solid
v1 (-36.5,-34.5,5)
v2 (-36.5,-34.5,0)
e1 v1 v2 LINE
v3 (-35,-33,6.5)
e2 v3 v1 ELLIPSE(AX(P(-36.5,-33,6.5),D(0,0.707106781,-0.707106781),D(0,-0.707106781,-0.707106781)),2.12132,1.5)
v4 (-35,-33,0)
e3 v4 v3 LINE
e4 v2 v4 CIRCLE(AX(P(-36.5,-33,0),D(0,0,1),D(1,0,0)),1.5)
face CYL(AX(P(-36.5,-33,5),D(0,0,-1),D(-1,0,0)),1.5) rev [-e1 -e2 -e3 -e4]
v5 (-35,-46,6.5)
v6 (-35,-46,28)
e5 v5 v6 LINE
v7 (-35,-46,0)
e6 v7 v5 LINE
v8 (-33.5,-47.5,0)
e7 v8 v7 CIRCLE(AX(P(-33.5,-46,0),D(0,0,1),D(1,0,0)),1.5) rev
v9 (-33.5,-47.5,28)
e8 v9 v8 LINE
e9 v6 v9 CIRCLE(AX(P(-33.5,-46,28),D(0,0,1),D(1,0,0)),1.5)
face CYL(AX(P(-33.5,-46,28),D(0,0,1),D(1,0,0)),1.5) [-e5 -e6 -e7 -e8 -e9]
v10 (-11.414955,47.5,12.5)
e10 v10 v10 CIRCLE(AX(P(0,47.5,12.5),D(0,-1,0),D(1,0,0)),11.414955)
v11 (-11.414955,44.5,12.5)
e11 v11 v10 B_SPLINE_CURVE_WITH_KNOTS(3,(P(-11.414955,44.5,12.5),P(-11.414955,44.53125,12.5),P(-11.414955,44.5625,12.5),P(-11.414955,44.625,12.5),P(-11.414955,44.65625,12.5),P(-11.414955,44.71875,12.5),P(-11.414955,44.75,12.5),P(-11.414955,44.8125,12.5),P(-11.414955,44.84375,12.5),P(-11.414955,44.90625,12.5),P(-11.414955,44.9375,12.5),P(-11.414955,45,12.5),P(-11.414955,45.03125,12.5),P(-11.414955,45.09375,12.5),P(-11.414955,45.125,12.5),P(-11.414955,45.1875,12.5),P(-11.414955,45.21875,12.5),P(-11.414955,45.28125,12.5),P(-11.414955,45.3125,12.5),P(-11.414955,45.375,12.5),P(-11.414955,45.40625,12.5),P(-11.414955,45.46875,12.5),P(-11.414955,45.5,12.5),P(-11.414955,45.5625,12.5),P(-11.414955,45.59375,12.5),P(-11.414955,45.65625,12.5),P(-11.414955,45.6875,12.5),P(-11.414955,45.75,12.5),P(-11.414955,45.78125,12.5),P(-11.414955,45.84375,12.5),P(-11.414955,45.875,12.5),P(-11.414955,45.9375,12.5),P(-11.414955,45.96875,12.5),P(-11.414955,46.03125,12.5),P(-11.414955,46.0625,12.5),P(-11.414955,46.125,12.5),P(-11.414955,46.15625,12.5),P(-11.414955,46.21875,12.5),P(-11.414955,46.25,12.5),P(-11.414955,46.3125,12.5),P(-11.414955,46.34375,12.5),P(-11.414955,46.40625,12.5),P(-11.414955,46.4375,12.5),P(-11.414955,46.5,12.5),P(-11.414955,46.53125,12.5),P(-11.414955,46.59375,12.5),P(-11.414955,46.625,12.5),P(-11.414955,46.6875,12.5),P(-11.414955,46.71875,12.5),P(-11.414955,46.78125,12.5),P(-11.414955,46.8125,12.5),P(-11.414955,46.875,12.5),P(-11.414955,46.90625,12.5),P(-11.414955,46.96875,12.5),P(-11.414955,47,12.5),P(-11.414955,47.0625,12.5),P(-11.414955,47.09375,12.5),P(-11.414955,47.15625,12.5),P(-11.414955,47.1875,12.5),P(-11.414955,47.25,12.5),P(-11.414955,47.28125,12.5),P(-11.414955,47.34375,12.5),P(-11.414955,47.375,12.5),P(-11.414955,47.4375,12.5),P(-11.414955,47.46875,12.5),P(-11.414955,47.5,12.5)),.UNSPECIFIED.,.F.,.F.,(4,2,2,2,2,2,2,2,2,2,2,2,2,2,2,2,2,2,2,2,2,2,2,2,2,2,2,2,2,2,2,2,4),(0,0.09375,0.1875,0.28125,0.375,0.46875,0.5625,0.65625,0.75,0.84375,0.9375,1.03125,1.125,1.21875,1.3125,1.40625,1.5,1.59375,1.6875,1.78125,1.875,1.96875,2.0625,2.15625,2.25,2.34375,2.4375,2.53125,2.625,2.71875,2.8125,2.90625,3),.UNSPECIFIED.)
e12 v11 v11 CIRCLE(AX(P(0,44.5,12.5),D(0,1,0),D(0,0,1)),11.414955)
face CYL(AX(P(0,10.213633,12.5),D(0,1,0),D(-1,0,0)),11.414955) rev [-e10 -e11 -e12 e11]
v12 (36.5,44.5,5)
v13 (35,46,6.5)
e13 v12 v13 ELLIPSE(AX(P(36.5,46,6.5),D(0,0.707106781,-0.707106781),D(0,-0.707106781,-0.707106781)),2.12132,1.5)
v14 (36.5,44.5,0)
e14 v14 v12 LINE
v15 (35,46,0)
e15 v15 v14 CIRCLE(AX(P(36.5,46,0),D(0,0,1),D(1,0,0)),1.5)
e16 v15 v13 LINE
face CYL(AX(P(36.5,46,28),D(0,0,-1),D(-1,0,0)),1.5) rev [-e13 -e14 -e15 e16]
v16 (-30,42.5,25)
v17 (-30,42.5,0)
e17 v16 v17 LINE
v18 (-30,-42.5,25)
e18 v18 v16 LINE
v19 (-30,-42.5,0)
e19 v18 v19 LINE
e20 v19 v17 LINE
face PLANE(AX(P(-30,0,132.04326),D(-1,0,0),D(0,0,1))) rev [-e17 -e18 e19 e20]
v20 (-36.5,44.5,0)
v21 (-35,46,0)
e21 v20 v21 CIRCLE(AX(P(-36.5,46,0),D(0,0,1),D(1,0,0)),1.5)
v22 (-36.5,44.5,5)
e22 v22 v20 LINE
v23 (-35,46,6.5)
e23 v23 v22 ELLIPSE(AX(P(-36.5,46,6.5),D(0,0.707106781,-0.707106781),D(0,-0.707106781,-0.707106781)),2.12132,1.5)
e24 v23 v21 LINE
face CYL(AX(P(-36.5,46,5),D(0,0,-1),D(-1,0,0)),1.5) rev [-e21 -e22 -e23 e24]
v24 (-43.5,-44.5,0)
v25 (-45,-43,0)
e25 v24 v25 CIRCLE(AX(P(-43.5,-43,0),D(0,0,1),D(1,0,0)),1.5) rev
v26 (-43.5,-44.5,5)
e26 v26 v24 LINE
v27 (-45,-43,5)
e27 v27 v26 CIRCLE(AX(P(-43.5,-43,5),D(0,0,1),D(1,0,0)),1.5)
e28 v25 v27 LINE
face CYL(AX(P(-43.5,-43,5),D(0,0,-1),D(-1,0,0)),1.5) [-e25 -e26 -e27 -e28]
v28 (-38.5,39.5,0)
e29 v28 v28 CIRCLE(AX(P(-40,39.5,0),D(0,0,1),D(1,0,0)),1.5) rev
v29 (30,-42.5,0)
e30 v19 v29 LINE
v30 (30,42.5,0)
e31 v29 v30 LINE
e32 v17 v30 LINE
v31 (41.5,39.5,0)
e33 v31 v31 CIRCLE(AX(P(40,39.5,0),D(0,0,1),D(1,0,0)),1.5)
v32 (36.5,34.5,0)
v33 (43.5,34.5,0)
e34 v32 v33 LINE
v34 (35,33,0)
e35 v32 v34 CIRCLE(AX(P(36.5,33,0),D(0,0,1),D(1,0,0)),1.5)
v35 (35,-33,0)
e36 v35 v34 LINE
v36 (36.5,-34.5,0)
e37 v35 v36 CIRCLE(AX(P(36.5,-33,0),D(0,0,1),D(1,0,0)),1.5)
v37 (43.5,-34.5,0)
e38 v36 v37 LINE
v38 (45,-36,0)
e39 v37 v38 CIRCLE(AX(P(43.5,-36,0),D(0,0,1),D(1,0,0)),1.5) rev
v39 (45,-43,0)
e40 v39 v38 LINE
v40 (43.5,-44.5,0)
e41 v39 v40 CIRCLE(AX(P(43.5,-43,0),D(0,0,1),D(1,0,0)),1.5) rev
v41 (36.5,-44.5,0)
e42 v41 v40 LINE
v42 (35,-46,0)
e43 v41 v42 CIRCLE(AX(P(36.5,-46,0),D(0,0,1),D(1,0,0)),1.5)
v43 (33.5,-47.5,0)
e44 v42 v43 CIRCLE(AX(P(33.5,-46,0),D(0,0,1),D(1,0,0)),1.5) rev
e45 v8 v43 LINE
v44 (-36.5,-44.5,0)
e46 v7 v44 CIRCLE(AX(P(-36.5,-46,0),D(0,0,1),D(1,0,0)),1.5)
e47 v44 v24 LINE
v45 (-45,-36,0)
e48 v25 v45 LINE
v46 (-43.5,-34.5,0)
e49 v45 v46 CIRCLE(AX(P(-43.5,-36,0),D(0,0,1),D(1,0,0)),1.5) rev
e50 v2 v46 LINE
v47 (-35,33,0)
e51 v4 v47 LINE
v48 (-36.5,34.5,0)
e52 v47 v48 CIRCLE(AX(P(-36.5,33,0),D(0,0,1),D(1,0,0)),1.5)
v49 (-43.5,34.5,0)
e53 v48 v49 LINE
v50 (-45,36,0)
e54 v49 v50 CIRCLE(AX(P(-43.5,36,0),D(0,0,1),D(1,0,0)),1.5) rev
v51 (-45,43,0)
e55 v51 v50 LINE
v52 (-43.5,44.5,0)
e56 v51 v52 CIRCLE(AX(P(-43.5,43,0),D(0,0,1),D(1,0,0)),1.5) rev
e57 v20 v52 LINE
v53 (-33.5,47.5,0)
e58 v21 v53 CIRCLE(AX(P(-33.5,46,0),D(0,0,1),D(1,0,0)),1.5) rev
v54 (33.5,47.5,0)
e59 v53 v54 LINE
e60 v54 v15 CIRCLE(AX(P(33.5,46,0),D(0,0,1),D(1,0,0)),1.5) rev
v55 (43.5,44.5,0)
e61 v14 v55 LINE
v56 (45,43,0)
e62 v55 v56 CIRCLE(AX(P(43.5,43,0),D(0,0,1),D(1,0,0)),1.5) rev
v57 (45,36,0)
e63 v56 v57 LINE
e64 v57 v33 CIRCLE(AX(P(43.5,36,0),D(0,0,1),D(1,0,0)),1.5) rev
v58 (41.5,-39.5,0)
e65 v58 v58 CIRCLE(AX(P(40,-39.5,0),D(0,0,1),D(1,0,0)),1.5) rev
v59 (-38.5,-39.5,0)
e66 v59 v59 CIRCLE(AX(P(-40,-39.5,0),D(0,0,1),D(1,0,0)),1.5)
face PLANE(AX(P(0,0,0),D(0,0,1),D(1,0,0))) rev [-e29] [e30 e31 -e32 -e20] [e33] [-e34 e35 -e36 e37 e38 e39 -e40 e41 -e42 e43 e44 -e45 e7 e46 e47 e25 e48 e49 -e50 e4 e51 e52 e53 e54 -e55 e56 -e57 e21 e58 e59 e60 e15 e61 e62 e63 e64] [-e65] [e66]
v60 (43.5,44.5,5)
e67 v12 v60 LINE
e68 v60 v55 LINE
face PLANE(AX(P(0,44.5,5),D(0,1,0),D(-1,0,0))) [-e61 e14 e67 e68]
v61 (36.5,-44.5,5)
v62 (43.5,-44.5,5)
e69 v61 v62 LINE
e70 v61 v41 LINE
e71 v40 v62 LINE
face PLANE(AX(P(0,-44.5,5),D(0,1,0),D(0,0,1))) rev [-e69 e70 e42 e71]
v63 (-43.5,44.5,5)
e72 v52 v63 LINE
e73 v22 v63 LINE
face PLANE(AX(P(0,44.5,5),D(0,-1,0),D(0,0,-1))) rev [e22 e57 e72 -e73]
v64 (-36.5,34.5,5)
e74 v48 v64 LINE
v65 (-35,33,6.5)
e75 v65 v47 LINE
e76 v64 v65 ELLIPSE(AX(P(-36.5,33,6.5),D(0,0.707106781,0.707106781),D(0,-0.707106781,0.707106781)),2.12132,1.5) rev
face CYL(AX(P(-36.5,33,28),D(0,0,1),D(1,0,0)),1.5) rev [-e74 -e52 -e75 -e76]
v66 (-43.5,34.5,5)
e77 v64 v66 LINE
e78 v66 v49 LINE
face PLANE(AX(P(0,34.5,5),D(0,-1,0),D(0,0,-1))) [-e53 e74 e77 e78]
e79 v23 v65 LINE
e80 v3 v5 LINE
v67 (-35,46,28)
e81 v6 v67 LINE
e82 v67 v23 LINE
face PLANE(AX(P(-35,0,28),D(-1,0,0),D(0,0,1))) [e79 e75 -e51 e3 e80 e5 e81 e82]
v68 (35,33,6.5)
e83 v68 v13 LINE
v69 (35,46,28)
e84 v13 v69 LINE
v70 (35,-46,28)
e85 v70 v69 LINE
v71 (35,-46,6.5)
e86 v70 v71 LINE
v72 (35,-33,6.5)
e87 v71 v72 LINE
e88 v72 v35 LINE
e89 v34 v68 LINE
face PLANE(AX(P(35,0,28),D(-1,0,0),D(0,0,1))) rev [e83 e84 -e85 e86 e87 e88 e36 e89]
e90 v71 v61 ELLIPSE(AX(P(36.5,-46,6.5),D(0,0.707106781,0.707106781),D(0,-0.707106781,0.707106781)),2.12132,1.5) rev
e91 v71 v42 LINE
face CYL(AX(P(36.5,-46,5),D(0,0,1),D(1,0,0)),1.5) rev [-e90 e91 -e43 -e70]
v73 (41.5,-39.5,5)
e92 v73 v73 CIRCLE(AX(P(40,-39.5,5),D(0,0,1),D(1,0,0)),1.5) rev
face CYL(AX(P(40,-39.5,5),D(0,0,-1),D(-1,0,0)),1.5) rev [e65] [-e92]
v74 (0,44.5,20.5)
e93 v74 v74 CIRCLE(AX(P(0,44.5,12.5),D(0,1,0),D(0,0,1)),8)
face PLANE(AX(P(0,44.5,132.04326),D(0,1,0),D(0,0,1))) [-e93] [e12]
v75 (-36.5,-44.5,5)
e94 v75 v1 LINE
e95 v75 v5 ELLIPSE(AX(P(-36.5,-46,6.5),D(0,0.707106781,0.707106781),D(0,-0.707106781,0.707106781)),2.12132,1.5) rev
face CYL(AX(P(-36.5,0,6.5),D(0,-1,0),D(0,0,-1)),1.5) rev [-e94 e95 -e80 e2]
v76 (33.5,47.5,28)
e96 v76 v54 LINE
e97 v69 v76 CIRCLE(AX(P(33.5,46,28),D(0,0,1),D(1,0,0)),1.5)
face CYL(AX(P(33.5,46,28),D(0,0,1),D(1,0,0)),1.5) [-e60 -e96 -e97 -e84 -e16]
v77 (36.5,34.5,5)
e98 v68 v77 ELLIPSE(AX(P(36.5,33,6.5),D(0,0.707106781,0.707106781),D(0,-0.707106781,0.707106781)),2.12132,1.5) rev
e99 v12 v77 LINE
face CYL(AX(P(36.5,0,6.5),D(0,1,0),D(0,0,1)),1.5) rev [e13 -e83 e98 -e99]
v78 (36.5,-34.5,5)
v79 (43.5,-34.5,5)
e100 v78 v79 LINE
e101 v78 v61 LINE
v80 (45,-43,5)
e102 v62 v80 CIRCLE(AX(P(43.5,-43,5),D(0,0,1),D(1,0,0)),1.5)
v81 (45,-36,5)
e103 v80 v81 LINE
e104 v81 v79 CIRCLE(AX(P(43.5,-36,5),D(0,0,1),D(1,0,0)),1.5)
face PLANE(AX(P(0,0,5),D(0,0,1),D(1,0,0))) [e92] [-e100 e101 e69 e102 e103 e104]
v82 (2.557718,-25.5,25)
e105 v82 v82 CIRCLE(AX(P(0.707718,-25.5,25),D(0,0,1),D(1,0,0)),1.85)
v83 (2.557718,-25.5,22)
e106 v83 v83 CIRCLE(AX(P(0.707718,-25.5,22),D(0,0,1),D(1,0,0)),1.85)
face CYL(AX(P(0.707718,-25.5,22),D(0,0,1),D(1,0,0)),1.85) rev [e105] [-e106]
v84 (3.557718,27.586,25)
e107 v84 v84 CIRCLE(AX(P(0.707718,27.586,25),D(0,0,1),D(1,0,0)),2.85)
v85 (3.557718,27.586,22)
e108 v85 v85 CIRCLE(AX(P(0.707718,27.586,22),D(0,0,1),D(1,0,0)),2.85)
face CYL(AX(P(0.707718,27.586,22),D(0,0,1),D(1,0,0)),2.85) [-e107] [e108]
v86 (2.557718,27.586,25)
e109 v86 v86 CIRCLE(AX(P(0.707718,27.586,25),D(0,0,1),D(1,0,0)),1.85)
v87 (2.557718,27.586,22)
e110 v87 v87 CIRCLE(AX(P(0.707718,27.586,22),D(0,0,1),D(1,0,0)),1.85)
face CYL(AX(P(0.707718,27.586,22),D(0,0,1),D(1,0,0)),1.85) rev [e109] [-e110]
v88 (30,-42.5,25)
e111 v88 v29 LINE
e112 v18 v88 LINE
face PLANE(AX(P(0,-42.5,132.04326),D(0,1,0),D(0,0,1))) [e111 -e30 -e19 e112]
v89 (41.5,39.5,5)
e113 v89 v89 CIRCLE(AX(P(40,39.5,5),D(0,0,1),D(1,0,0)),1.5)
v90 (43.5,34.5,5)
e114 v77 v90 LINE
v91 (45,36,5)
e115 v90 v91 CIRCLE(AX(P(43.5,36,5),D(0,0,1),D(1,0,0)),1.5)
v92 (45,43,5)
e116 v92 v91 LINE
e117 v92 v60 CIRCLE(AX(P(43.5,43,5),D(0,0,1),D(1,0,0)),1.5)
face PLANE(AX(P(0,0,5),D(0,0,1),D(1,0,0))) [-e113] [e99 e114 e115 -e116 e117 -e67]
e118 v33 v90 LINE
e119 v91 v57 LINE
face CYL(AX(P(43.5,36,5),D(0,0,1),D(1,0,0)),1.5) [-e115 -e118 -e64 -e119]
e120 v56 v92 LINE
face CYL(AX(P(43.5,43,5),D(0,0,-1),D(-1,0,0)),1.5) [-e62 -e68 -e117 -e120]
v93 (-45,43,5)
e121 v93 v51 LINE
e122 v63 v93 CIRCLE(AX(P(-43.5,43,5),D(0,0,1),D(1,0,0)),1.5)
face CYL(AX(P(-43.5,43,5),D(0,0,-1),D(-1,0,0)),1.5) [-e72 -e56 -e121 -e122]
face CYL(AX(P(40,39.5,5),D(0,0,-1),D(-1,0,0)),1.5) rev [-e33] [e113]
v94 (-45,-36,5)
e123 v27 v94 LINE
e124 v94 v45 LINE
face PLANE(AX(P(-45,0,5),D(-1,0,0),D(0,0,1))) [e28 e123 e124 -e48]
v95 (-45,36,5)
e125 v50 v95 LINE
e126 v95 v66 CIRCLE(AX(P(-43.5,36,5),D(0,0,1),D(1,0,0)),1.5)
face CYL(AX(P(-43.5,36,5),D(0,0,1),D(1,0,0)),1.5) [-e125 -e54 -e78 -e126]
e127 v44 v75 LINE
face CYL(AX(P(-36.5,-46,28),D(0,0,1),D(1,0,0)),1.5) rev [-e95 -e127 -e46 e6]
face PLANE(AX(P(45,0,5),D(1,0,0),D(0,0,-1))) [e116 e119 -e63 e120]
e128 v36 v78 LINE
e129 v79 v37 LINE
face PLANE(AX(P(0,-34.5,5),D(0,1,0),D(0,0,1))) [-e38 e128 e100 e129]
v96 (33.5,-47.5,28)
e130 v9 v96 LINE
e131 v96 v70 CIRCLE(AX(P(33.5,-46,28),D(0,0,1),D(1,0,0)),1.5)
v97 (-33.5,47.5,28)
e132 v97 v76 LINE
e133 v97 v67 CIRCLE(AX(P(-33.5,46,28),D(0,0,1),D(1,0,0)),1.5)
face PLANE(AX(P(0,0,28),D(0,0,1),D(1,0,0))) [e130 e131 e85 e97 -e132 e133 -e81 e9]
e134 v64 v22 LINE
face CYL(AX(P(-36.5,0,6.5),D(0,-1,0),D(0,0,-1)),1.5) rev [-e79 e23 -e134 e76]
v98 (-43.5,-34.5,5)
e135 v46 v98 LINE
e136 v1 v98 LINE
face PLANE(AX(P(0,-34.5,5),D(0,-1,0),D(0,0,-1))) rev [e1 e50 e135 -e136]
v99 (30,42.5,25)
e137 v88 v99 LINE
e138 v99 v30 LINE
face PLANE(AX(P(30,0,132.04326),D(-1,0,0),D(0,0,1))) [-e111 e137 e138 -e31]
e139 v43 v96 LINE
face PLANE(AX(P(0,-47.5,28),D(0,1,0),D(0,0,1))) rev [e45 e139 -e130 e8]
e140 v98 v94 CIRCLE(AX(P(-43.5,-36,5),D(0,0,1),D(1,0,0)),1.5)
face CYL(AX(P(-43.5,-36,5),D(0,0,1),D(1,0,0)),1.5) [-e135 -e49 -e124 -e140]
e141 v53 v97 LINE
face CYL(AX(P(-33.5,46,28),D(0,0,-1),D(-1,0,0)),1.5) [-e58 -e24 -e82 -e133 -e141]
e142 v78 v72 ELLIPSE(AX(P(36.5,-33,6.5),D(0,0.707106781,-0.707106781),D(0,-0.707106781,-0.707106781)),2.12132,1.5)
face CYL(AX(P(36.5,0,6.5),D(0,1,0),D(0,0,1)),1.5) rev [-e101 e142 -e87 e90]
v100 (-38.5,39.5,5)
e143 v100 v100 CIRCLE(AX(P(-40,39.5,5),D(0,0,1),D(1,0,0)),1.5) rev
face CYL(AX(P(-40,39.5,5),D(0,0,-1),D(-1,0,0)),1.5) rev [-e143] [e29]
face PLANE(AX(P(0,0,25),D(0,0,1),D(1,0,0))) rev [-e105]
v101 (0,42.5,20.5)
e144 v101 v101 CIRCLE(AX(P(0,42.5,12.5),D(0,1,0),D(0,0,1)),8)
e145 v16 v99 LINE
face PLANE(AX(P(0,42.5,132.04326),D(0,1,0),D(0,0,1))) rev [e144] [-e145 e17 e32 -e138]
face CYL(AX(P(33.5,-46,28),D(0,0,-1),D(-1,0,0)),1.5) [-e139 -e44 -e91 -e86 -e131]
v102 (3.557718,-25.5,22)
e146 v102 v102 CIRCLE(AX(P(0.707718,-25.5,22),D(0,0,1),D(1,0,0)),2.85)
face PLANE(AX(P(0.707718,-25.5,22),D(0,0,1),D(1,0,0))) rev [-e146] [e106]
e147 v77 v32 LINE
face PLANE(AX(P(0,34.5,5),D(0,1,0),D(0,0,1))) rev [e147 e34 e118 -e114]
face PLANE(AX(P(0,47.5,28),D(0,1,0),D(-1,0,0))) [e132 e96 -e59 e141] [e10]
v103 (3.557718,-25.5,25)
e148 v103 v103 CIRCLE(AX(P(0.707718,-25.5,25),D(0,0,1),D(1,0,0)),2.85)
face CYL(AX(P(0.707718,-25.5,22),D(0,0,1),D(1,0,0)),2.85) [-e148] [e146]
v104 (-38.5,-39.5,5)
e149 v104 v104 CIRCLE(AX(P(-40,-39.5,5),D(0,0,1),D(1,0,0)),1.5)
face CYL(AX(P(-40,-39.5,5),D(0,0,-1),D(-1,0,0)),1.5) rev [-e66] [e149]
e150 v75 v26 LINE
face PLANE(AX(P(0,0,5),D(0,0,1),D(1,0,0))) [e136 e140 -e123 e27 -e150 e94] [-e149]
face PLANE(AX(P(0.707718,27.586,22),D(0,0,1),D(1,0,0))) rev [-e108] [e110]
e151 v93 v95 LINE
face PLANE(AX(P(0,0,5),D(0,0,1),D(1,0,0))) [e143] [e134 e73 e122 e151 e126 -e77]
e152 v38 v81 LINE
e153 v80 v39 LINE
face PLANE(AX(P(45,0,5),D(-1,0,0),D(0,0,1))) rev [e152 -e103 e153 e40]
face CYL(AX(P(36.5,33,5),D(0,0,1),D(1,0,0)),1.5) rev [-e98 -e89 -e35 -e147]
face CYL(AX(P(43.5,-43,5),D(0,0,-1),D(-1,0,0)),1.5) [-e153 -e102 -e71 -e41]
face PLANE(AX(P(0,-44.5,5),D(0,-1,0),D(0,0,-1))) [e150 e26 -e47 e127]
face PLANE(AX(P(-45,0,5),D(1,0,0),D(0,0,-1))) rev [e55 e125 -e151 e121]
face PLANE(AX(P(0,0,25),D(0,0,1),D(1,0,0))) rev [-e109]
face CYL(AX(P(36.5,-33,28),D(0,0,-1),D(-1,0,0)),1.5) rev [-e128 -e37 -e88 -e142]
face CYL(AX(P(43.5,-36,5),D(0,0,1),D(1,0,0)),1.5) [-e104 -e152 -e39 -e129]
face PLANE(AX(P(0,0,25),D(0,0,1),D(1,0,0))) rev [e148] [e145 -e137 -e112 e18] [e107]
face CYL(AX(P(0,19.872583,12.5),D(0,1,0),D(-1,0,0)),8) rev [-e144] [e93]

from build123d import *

# Parameters (mm, degrees)
SKETCH1_W            = 70
SKETCH1_H            = 95
BASE_DEPTH           = 28
SKETCH1_7_W          = 10
SKETCH1_7_H          = 10
SKETCH1_7_R          = 1.5
MOUNTING_HOLES_DEPTH = 5
SKETCH1_6_W          = 60
SKETCH1_6_H          = 85
SKETCH1_6_R          = 2.85
SKETCH1_6_R_2        = 1.85
CAVITY_DEPTH         = 25
STANDOFF_START       = 25
SKETCH1_9_R          = 2.85
SKETCH1_9_R_2        = 1.85
STANDOFF_DEPTH       = 3
PG9_DEPTH            = 5
SKETCH3_3_R          = 11.414954575
SKETCH3_3_R_2        = 8
CUT_EXTRUDE4_DEPTH   = 3
EXTERNAL_FILLET_R    = 1.5


with BuildPart() as part:
    # Sketch1 → Base (new body)
    with BuildSketch(Plane.XY):
        Rectangle(SKETCH1_W, SKETCH1_H)
    extrude(amount=BASE_DEPTH)

    # Sketch1<7> → Mounting Holes (add)
    # profile 1 of 4: a face of its own
    with BuildSketch(Plane.XY):
        with Locations((40, 39.5)):
            Rectangle(SKETCH1_7_W, SKETCH1_7_H)
        with Locations((40, 39.5)):
            Circle(SKETCH1_7_R, mode=Mode.SUBTRACT)
    # profile 2 of 4: a face of its own
    with BuildSketch(Plane.XY):
        with Locations((40, -39.5)):
            Rectangle(SKETCH1_7_W, SKETCH1_7_H)
        with Locations((40, -39.5)):
            Circle(SKETCH1_7_R, mode=Mode.SUBTRACT)
    # profile 3 of 4: a face of its own
    with BuildSketch(Plane.XY):
        with Locations((-40, -39.5)):
            Rectangle(SKETCH1_7_W, SKETCH1_7_H)
        with Locations((-40, -39.5)):
            Circle(SKETCH1_7_R, mode=Mode.SUBTRACT)
    # profile 4 of 4: a face of its own
    with BuildSketch(Plane.XY):
        with Locations((-40, 39.5)):
            Rectangle(SKETCH1_7_W, SKETCH1_7_H)
        with Locations((-40, 39.5)):
            Circle(SKETCH1_7_R, mode=Mode.SUBTRACT)
    extrude(amount=MOUNTING_HOLES_DEPTH)

    # Sketch1<6> → Cavity (cut)
    # profile 1 of 5: a face of its own
    with BuildSketch(Plane.XY):
        Rectangle(SKETCH1_6_W, SKETCH1_6_H)
        with Locations((0.70771822, -25.5)):
            Circle(SKETCH1_6_R, mode=Mode.SUBTRACT)
        with Locations((0.70771822, 27.586)):
            Circle(SKETCH1_6_R, mode=Mode.SUBTRACT)
    # profile 2 of 5: a face of its own
    with BuildSketch(Plane.XY):
        with Locations((0.70771822, 27.586)):
            Circle(SKETCH1_6_R)
        with Locations((0.70771822, 27.586)):
            Circle(SKETCH1_6_R_2, mode=Mode.SUBTRACT)
    # profile 3 of 5: a face of its own
    with BuildSketch(Plane.XY):
        with Locations((0.70771822, 27.586)):
            Circle(SKETCH1_6_R_2)
    # profile 4 of 5: a face of its own
    with BuildSketch(Plane.XY):
        with Locations((0.70771822, -25.5)):
            Circle(SKETCH1_6_R)
        with Locations((0.70771822, -25.5)):
            Circle(SKETCH1_6_R_2, mode=Mode.SUBTRACT)
    # profile 5 of 5: a face of its own
    with BuildSketch(Plane.XY):
        with Locations((0.70771822, -25.5)):
            Circle(SKETCH1_6_R_2)
    extrude(amount=CAVITY_DEPTH, mode=Mode.SUBTRACT)

    # Sketch1<9> → Standoff (add)
    # profile 1 of 2: a face of its own
    with BuildSketch(Plane.XY.offset(STANDOFF_START)):
        with Locations((0.70771822, 27.586)):
            Circle(SKETCH1_9_R)
        with Locations((0.70771822, 27.586)):
            Circle(SKETCH1_9_R_2, mode=Mode.SUBTRACT)
    # profile 2 of 2: a face of its own
    with BuildSketch(Plane.XY.offset(STANDOFF_START)):
        with Locations((0.70771822, -25.5)):
            Circle(SKETCH1_9_R)
        with Locations((0.70771822, -25.5)):
            Circle(SKETCH1_9_R_2, mode=Mode.SUBTRACT)
    extrude(amount=-STANDOFF_DEPTH)

    # Sketch3 → PG9 (cut)
    with BuildSketch(Plane(origin=(7.707718219, 47.5, 0), x_dir=(0, 0, 1), z_dir=(0, -1, 0))):
        with BuildLine():
            ThreePointArc((4.5, 7.707718219), (12.5, -0.292281781), (20.5, 7.707718219))
            Line((20.5, 7.707718219), (4.5, 7.707718219))
        make_face()
        with BuildLine():
            Line((4.5, 7.707718219), (20.5, 7.707718219))
            ThreePointArc((20.5, 7.707718219), (12.5, 15.707718219), (4.5, 7.707718219))
        make_face()
    extrude(amount=PG9_DEPTH, mode=Mode.SUBTRACT)

    # Sketch3<3> → Cut-Extrude4 (cut)
    with BuildSketch(Plane(origin=(7.707718219, 47.5, 0), x_dir=(0, 0, 1), z_dir=(0, -1, 0))):
        with Locations(Location((12.5, 7.707718219, 0), (0, 0, 90))):
            Circle(SKETCH3_3_R)
        with Locations((12.5, 7.707718219)):
            Circle(SKETCH3_3_R_2, mode=Mode.SUBTRACT)
    extrude(amount=CUT_EXTRUDE4_DEPTH, mode=Mode.SUBTRACT)

    # External Fillet
    external_fillet_edges = [part.edges().sort_by_distance(p)[0] for p in [
        (45, 34.5, 2.5),
        (45, 44.5, 2.5),
        (35, 39.5, 5),
        (35, 44.5, 2.5),
        (35, 34.5, 2.5),
        (45, -34.5, 2.5),
        (35, -39.5, 5),
        (35, -34.5, 2.5),
        (35, -44.5, 2.5),
        (45, -44.5, 2.5),
        (-45, -34.5, 2.5),
        (-45, -44.5, 2.5),
        (-35, -44.5, 2.5),
        (-35, -34.5, 2.5),
        (-35, -39.5, 5),
        (-35, 34.5, 2.5),
        (-35, 44.5, 2.5),
        (-45, 44.5, 2.5),
        (-45, 34.5, 2.5),
        (-35, 39.5, 5),
        (-35, -47.5, 14),
        (-35, 47.5, 14),
        (35, 47.5, 14),
        (35, -47.5, 14),
    ]]
    fillet(external_fillet_edges, radius=EXTERNAL_FILLET_R - 0.0001)  # a hair under: the kernel refuses the full size


solid = part.part
